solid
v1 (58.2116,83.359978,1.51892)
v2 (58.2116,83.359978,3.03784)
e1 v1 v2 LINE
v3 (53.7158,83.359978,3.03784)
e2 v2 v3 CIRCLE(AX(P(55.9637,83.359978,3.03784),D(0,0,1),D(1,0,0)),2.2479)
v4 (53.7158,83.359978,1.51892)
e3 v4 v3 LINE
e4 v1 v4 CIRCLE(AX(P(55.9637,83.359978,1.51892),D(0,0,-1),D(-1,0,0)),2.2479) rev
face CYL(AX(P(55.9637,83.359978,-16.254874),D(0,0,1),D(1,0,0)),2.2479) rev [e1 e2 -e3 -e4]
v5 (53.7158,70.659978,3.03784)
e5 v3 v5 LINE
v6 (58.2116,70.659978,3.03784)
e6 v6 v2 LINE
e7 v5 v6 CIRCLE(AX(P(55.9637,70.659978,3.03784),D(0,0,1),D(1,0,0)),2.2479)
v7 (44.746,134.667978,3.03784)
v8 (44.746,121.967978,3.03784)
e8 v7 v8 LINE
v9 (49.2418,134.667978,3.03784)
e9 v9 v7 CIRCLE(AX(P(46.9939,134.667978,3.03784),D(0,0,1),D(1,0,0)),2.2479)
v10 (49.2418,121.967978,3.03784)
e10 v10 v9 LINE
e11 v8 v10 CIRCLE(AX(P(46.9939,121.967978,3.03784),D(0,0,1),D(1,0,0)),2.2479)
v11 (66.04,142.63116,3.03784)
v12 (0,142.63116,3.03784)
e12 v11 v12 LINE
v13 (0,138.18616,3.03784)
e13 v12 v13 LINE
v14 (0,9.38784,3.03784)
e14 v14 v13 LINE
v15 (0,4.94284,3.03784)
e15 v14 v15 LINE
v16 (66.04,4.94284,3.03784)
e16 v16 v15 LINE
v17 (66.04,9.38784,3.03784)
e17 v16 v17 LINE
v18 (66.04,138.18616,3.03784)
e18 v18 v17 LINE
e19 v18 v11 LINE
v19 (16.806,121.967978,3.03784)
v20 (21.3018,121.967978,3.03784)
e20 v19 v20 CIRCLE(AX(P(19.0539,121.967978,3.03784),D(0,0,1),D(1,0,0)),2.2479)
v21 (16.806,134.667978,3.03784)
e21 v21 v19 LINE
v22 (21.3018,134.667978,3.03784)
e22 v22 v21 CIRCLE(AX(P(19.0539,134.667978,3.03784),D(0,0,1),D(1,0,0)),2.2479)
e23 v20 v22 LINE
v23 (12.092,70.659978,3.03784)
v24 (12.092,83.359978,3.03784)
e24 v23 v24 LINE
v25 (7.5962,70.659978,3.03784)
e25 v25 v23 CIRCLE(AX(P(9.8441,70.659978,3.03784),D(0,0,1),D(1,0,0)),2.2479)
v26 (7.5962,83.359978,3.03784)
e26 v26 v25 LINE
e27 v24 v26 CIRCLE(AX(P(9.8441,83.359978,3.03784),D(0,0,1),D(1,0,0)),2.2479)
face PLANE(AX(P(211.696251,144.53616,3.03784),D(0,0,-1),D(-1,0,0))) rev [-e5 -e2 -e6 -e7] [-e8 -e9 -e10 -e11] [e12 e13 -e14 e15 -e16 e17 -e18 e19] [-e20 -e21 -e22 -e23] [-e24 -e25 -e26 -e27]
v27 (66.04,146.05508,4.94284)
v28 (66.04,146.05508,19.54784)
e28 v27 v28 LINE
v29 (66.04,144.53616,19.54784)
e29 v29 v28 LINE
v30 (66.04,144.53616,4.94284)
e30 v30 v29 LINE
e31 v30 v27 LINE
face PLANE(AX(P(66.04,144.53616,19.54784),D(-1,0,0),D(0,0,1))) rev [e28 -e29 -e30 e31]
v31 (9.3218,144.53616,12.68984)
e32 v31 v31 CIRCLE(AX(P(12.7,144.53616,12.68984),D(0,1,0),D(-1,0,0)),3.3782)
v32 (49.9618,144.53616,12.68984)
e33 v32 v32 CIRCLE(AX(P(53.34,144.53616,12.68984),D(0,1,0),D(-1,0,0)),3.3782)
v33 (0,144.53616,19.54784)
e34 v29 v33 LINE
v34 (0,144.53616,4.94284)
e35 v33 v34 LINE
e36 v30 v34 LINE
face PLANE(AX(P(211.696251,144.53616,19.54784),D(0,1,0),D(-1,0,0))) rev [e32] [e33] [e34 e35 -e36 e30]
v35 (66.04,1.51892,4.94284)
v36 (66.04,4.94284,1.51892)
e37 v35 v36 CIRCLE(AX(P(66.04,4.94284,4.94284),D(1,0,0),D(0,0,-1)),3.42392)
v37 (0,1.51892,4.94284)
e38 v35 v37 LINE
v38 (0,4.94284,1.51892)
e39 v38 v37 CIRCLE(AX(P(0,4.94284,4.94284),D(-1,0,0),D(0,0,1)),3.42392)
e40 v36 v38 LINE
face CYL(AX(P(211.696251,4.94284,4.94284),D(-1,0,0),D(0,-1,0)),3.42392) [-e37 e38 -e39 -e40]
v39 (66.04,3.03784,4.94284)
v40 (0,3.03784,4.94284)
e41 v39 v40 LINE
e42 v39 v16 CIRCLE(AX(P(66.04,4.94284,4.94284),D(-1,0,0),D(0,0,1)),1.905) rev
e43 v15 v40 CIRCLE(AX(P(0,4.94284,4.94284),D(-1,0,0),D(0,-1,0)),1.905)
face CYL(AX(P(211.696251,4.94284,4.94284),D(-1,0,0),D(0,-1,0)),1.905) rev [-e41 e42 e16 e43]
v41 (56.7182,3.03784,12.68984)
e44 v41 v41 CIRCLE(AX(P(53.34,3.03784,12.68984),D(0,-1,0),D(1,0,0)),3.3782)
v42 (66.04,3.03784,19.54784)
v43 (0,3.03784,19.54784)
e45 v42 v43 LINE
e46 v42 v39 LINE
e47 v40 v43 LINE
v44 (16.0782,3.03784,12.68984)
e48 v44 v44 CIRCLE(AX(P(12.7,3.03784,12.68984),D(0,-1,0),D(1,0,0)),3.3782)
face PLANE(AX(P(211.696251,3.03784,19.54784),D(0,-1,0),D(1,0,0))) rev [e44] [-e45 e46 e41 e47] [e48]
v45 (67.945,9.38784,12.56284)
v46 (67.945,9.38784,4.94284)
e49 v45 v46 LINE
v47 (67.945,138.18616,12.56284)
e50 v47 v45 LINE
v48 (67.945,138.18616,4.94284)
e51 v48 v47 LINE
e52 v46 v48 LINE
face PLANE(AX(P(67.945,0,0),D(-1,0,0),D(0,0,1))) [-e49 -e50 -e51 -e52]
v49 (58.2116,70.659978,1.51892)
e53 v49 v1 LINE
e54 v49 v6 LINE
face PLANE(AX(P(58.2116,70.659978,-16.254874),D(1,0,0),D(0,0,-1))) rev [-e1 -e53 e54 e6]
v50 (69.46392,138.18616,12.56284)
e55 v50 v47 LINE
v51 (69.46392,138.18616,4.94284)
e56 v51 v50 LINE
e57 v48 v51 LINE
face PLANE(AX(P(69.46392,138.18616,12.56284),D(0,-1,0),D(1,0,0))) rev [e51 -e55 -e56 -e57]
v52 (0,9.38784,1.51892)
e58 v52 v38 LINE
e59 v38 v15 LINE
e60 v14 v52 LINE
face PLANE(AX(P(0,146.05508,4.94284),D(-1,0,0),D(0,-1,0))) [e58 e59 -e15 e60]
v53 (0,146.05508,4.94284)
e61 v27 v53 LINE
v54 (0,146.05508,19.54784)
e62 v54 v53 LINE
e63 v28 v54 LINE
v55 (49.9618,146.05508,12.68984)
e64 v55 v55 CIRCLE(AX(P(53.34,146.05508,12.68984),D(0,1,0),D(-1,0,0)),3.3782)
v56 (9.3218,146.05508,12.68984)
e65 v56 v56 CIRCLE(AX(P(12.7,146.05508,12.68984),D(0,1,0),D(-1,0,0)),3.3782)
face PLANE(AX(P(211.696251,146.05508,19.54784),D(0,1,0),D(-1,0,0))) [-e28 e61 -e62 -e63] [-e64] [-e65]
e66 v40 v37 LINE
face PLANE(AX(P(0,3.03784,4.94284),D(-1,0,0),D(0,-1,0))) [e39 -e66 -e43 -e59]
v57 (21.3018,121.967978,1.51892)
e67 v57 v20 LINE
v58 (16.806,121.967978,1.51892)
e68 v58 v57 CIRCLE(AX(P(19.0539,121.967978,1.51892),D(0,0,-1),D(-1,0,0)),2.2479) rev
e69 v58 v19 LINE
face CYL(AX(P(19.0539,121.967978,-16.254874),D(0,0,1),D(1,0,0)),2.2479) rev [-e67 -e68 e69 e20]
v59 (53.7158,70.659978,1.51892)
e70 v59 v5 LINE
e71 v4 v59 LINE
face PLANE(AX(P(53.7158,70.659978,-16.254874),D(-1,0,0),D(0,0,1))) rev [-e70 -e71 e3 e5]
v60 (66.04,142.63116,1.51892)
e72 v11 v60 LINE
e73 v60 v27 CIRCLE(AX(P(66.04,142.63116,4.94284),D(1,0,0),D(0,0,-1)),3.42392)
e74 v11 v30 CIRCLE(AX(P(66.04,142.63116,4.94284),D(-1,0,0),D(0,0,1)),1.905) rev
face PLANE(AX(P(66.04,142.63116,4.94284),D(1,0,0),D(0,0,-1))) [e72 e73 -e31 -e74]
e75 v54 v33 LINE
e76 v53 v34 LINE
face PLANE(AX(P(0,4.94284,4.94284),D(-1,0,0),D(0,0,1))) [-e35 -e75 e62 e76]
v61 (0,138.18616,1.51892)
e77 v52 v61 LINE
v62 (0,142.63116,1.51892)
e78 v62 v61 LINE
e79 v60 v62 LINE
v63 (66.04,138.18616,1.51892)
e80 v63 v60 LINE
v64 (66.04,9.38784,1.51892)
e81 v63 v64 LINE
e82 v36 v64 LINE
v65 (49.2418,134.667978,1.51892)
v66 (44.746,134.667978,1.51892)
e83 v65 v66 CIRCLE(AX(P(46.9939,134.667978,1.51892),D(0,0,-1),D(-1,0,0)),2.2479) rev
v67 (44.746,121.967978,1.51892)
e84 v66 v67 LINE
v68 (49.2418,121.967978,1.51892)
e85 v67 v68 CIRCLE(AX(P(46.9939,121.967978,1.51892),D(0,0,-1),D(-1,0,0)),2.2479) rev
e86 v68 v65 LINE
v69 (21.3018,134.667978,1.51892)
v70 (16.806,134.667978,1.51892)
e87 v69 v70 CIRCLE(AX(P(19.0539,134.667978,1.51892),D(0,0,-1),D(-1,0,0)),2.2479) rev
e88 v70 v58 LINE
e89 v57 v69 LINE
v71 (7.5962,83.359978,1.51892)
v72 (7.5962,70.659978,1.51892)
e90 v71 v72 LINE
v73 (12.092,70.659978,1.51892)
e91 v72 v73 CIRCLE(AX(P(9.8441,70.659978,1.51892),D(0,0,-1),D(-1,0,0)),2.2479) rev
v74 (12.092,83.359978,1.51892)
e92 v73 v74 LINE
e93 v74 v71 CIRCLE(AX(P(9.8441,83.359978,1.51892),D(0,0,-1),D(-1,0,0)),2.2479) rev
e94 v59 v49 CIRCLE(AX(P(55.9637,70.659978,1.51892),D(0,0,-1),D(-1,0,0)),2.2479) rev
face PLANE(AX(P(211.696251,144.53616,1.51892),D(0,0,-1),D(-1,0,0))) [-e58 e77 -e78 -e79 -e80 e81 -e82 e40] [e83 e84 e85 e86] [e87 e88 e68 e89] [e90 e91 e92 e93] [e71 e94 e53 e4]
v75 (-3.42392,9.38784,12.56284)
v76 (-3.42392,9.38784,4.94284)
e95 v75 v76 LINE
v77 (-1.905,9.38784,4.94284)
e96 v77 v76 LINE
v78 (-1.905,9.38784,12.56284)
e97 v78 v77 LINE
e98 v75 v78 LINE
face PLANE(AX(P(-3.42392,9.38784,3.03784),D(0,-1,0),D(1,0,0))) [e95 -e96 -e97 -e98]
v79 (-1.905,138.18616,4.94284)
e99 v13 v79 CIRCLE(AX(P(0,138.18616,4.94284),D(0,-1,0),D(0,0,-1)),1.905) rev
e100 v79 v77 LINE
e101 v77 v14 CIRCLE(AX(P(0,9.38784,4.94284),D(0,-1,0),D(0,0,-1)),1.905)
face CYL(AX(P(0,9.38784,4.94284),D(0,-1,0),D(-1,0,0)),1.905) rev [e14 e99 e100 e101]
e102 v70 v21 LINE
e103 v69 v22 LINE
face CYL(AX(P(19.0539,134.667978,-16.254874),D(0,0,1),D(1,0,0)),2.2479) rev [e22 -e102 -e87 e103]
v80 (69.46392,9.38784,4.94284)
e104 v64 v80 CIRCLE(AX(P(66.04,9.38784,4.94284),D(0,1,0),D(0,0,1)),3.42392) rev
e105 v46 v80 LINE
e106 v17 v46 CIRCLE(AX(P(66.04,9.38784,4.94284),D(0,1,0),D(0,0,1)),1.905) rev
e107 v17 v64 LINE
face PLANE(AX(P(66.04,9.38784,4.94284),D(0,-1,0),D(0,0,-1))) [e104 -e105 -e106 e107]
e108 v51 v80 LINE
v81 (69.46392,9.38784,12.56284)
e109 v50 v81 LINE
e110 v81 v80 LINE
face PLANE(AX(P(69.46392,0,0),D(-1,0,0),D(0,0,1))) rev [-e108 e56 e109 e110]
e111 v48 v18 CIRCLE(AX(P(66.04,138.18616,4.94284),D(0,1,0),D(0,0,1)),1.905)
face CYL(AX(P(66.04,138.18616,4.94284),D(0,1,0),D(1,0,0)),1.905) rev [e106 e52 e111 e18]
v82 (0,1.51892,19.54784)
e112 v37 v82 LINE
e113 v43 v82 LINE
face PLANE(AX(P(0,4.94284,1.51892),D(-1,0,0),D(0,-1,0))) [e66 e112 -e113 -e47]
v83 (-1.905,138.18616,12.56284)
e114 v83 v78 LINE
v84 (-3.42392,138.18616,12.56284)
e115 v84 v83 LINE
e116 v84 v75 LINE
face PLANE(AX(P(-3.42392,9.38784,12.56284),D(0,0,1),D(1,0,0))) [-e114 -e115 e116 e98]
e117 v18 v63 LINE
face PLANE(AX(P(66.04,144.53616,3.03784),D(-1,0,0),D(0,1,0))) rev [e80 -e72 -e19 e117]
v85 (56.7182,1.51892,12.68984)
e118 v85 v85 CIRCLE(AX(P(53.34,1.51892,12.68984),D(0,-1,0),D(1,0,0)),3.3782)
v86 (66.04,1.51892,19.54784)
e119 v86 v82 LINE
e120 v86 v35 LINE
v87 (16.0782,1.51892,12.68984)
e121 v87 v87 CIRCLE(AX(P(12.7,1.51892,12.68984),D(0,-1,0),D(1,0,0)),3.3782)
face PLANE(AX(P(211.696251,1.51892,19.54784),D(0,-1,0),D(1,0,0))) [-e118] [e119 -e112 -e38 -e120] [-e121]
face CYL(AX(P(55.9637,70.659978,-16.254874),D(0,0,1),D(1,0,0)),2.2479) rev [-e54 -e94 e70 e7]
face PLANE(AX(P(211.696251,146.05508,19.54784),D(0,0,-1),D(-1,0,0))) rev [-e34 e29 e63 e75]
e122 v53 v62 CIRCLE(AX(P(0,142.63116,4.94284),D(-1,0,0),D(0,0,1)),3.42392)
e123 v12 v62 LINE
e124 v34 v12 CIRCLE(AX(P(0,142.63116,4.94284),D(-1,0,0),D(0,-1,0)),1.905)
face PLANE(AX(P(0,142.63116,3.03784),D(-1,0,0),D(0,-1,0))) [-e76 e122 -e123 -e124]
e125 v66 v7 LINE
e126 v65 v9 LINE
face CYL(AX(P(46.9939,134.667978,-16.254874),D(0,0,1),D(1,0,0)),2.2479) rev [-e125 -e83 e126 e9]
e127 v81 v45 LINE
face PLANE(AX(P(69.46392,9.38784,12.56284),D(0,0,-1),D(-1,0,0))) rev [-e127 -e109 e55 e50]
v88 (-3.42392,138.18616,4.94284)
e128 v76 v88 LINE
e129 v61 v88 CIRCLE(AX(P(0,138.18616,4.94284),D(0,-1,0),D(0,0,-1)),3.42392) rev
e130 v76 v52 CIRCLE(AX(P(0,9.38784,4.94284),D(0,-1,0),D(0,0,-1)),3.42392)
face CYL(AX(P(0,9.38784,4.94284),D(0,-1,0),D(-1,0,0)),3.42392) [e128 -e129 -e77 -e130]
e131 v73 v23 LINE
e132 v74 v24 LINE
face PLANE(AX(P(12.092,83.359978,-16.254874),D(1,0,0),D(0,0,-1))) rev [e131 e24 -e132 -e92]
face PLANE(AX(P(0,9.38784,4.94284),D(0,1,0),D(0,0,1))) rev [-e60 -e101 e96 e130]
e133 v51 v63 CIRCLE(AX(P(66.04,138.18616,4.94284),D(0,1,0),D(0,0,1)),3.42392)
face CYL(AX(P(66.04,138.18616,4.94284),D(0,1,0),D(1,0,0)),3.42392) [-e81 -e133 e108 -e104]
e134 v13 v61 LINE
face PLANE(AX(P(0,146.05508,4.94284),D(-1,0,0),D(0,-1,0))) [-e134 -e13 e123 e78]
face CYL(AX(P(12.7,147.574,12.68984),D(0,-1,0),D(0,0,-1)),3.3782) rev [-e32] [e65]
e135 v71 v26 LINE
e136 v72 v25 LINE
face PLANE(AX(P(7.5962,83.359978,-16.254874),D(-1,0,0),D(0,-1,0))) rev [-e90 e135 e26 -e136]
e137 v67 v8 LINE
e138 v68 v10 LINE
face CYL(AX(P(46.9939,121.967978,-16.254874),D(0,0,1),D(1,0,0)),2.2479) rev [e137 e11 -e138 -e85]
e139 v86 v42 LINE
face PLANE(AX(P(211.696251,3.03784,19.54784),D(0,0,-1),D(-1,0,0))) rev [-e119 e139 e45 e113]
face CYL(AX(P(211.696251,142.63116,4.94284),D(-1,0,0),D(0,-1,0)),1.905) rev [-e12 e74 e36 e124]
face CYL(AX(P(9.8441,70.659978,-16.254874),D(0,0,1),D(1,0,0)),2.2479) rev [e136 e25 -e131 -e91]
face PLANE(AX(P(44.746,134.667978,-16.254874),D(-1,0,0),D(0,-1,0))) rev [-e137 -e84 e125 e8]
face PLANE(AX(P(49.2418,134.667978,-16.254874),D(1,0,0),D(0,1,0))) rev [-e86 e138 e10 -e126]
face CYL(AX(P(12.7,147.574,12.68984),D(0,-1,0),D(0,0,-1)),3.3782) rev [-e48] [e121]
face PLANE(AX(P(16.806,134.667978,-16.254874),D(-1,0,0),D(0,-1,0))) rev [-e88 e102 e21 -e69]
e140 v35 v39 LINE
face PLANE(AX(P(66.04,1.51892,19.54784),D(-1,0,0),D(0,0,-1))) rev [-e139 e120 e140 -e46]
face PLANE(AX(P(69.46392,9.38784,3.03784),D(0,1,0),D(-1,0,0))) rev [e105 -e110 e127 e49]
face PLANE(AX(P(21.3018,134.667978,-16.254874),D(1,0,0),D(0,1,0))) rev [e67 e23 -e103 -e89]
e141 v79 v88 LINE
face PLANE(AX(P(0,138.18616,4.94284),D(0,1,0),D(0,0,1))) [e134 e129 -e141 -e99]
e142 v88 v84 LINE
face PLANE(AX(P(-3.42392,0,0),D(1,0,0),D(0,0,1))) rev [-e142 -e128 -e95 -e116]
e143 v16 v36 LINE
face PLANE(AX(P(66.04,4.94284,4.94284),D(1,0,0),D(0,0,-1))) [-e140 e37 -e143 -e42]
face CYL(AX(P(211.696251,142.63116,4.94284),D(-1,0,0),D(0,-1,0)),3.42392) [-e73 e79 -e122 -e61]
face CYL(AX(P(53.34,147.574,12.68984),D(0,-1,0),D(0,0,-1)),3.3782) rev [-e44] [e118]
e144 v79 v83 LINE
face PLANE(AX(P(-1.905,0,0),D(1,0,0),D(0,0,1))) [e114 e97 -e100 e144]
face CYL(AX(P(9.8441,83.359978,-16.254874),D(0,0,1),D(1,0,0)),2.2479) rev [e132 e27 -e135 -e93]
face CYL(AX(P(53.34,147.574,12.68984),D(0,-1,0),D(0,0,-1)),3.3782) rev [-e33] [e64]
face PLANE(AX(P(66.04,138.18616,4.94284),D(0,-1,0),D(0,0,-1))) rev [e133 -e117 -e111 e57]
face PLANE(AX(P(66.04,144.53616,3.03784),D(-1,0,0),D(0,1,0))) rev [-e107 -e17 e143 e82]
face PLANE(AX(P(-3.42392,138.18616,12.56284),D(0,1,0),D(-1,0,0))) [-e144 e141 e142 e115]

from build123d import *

# Parameters (mm, degrees)
SKETCH1_W           = 66.04
SKETCH1_H           = 147.574
BOSS_EXTRUDE1_DEPTH = 3.03784
SKETCH3_W           = 66.04
SKETCH3_H           = 3.03784
BOSS_EXTRUDE2_DEPTH = 16.51
SKETCH4_R           = 3.3782
CUT_EXTRUDE1_DEPTH  = 163.854183627
SKETCH5_R           = 2.5527
CUT_EXTRUDE2_DEPTH  = 3.03784
BASE_FLANGE1_START  = -66.04
BASE_FLANGE1_DEPTH  = 66.04
SKETCH11_R          = 3.3782
CUT_EXTRUDE3_DEPTH  = 163.854183627
SKETCH12_R          = 2.2479
CUT_EXTRUDE4_DEPTH  = 163.517528827
CUT_EXTRUDE6_DEPTH  = 1.51892
EDGE_FLANGE1_DEPTH  = 128.79832


# Read off the part's stored shape, not the designer's step: Base-Flange1
# Sheet-metal steps are written as plain solids
with BuildPart() as part:
    # Sketch1 → Boss-Extrude1 (new body)
    with BuildSketch(Plane.XY):
        with Locations((33.02, 73.787)):
            Rectangle(SKETCH1_W, SKETCH1_H)
    extrude(amount=BOSS_EXTRUDE1_DEPTH)

    # Sketch3 → Boss-Extrude2 (add)
    with BuildSketch(Plane.XY.offset(3.03784)):
        with Locations((33.02, 146.05508)):
            Rectangle(SKETCH3_W, SKETCH3_H)
        with Locations((33.02, 1.51892)):
            Rectangle(SKETCH3_W, SKETCH3_H)
    extrude(amount=BOSS_EXTRUDE2_DEPTH)

    # Sketch4 → Cut-Extrude1 (cut, through all)
    with BuildSketch(Plane.XZ):
        with Locations(Location((12.7, 12.68984, 0), (0, 0, 270))):
            Circle(SKETCH4_R)
        with Locations(Location((53.34, 12.68984, 0), (0, 0, 270))):
            Circle(SKETCH4_R)
    extrude(amount=-CUT_EXTRUDE1_DEPTH, mode=Mode.SUBTRACT)

    # Sketch5 → Cut-Extrude2 (cut)
    with BuildSketch(Plane.XY.offset(3.03784)):
        with Locations((46.99, 126.449057869)):
            Circle(SKETCH5_R)
        with Locations((19.05, 126.449057869)):
            Circle(SKETCH5_R)
        with Locations((6.35, 75.141057869)):
            Circle(SKETCH5_R)
        with Locations((59.69, 75.141057869)):
            Circle(SKETCH5_R)
    extrude(amount=-CUT_EXTRUDE2_DEPTH, mode=Mode.SUBTRACT)


with BuildPart() as body_2:
    # Base-Flange1 outline → Base-Flange1 (new body)
    with BuildSketch(Plane.ZY.offset(BASE_FLANGE1_START)):
        with BuildLine():
            ThreePointArc((1.51892, 4.94284), (2.52176295, 2.52176295), (4.94284, 1.51892))
            Line((4.94284, 1.51892), (19.54784, 1.51892))
            Line((19.54784, 1.51892), (19.54784, 3.03784))
            Line((19.54784, 3.03784), (4.94284, 3.03784))
            ThreePointArc((4.94284, 3.03784), (3.595801582, 3.595801582), (3.03784, 4.94284))
            Line((3.03784, 4.94284), (3.03784, 142.63116))
            ThreePointArc((3.03784, 142.63116), (3.595801582, 143.978198418), (4.94284, 144.53616))
            Line((4.94284, 144.53616), (19.54784, 144.53616))
            Line((19.54784, 144.53616), (19.54784, 146.05508))
            Line((19.54784, 146.05508), (4.94284, 146.05508))
            ThreePointArc((4.94284, 146.05508), (2.52176295, 145.05223705), (1.51892, 142.63116))
            Line((1.51892, 142.63116), (1.51892, 4.94284))
        make_face()
    extrude(amount=BASE_FLANGE1_DEPTH)

    # Sketch11 → Cut-Extrude3 (cut, through all)
    with BuildSketch(Plane.XZ):
        with Locations((53.34, 12.68984)):
            Circle(SKETCH11_R)
        with Locations((12.7, 12.68984)):
            Circle(SKETCH11_R)
    extrude(amount=-CUT_EXTRUDE3_DEPTH, mode=Mode.SUBTRACT)

    # Sketch12 → Cut-Extrude4 (cut, through all)
    with BuildSketch(Plane.XY.offset(3.03784)):
        with Locations((55.9637, 77.009977807)):
            Circle(SKETCH12_R)
        with Locations((9.8441, 77.009977807)):
            Circle(SKETCH12_R)
        with Locations((46.993900058, 128.317977807)):
            Circle(SKETCH12_R)
        with Locations((19.053900058, 128.317977807)):
            Circle(SKETCH12_R)
    extrude(amount=-CUT_EXTRUDE4_DEPTH, mode=Mode.SUBTRACT)

    # Sketch14 → Cut-Extrude6 (cut)
    with BuildSketch(Plane.XY.offset(3.03784)):
        with BuildLine():
            Line((21.301800058, 134.667977807), (21.301800058, 121.967977807))
            ThreePointArc((21.301800058, 121.967977807), (19.053900058, 119.720077807), (16.806000058, 121.967977807))
            Line((16.806000058, 121.967977807), (16.806000058, 134.667977807))
            ThreePointArc((16.806000058, 134.667977807), (19.053900058, 136.915877807), (21.301800058, 134.667977807))
        make_face()
        with BuildLine():
            Line((53.7158, 70.659977807), (53.7158, 83.359977807))
            ThreePointArc((53.7158, 83.359977807), (55.9637, 85.607877807), (58.2116, 83.359977807))
            Line((58.2116, 83.359977807), (58.2116, 70.659977807))
            ThreePointArc((58.2116, 70.659977807), (55.9637, 68.412077807), (53.7158, 70.659977807))
        make_face()
        with BuildLine():
            Line((49.241800058, 134.667977807), (49.241800058, 121.967977807))
            ThreePointArc((49.241800058, 121.967977807), (46.993900058, 119.720077807), (44.746000058, 121.967977807))
            Line((44.746000058, 121.967977807), (44.746000058, 134.667977807))
            ThreePointArc((44.746000058, 134.667977807), (46.993900058, 136.915877807), (49.241800058, 134.667977807))
        make_face()
        with BuildLine():
            Line((12.092, 83.359977807), (12.092, 70.659977807))
            ThreePointArc((12.092, 70.659977807), (9.8441, 68.412077807), (7.5962, 70.659977807))
            Line((7.5962, 70.659977807), (7.5962, 83.359977807))
            ThreePointArc((7.5962, 83.359977807), (9.8441, 85.607877807), (12.092, 83.359977807))
        make_face()
    extrude(amount=-CUT_EXTRUDE6_DEPTH, mode=Mode.SUBTRACT)

    # Edge-Flange1 section (across the edge) → Edge-Flange1 (add)
    with BuildSketch(Plane(origin=(67.945, 9.38784, 3.03784), x_dir=(-1, 0, 0), z_dir=(0, 1, 0))):
        with BuildLine():
            Line((-1.51892, 1.905), (-1.51892, 9.525))
            Line((-1.51892, 9.525), (0, 9.525))
            Line((0, 9.525), (0, 1.905))
            ThreePointArc((0, 1.905), (0.557961582, 0.557961582), (1.905, 0))
            Line((1.905, 0), (1.905, -1.51892))
            ThreePointArc((1.905, -1.51892), (-0.51607705, -0.51607705), (-1.51892, 1.905))
        make_face()
    edge_flange1 = extrude(amount=EDGE_FLANGE1_DEPTH)

    # Mirror1: Edge-Flange1 across plane
    add(edge_flange1.mirror(Plane(origin=(33.02, 0, 0), x_dir=(0, 0, 1), z_dir=(1, 0, 0))))


solid = body_2.part
